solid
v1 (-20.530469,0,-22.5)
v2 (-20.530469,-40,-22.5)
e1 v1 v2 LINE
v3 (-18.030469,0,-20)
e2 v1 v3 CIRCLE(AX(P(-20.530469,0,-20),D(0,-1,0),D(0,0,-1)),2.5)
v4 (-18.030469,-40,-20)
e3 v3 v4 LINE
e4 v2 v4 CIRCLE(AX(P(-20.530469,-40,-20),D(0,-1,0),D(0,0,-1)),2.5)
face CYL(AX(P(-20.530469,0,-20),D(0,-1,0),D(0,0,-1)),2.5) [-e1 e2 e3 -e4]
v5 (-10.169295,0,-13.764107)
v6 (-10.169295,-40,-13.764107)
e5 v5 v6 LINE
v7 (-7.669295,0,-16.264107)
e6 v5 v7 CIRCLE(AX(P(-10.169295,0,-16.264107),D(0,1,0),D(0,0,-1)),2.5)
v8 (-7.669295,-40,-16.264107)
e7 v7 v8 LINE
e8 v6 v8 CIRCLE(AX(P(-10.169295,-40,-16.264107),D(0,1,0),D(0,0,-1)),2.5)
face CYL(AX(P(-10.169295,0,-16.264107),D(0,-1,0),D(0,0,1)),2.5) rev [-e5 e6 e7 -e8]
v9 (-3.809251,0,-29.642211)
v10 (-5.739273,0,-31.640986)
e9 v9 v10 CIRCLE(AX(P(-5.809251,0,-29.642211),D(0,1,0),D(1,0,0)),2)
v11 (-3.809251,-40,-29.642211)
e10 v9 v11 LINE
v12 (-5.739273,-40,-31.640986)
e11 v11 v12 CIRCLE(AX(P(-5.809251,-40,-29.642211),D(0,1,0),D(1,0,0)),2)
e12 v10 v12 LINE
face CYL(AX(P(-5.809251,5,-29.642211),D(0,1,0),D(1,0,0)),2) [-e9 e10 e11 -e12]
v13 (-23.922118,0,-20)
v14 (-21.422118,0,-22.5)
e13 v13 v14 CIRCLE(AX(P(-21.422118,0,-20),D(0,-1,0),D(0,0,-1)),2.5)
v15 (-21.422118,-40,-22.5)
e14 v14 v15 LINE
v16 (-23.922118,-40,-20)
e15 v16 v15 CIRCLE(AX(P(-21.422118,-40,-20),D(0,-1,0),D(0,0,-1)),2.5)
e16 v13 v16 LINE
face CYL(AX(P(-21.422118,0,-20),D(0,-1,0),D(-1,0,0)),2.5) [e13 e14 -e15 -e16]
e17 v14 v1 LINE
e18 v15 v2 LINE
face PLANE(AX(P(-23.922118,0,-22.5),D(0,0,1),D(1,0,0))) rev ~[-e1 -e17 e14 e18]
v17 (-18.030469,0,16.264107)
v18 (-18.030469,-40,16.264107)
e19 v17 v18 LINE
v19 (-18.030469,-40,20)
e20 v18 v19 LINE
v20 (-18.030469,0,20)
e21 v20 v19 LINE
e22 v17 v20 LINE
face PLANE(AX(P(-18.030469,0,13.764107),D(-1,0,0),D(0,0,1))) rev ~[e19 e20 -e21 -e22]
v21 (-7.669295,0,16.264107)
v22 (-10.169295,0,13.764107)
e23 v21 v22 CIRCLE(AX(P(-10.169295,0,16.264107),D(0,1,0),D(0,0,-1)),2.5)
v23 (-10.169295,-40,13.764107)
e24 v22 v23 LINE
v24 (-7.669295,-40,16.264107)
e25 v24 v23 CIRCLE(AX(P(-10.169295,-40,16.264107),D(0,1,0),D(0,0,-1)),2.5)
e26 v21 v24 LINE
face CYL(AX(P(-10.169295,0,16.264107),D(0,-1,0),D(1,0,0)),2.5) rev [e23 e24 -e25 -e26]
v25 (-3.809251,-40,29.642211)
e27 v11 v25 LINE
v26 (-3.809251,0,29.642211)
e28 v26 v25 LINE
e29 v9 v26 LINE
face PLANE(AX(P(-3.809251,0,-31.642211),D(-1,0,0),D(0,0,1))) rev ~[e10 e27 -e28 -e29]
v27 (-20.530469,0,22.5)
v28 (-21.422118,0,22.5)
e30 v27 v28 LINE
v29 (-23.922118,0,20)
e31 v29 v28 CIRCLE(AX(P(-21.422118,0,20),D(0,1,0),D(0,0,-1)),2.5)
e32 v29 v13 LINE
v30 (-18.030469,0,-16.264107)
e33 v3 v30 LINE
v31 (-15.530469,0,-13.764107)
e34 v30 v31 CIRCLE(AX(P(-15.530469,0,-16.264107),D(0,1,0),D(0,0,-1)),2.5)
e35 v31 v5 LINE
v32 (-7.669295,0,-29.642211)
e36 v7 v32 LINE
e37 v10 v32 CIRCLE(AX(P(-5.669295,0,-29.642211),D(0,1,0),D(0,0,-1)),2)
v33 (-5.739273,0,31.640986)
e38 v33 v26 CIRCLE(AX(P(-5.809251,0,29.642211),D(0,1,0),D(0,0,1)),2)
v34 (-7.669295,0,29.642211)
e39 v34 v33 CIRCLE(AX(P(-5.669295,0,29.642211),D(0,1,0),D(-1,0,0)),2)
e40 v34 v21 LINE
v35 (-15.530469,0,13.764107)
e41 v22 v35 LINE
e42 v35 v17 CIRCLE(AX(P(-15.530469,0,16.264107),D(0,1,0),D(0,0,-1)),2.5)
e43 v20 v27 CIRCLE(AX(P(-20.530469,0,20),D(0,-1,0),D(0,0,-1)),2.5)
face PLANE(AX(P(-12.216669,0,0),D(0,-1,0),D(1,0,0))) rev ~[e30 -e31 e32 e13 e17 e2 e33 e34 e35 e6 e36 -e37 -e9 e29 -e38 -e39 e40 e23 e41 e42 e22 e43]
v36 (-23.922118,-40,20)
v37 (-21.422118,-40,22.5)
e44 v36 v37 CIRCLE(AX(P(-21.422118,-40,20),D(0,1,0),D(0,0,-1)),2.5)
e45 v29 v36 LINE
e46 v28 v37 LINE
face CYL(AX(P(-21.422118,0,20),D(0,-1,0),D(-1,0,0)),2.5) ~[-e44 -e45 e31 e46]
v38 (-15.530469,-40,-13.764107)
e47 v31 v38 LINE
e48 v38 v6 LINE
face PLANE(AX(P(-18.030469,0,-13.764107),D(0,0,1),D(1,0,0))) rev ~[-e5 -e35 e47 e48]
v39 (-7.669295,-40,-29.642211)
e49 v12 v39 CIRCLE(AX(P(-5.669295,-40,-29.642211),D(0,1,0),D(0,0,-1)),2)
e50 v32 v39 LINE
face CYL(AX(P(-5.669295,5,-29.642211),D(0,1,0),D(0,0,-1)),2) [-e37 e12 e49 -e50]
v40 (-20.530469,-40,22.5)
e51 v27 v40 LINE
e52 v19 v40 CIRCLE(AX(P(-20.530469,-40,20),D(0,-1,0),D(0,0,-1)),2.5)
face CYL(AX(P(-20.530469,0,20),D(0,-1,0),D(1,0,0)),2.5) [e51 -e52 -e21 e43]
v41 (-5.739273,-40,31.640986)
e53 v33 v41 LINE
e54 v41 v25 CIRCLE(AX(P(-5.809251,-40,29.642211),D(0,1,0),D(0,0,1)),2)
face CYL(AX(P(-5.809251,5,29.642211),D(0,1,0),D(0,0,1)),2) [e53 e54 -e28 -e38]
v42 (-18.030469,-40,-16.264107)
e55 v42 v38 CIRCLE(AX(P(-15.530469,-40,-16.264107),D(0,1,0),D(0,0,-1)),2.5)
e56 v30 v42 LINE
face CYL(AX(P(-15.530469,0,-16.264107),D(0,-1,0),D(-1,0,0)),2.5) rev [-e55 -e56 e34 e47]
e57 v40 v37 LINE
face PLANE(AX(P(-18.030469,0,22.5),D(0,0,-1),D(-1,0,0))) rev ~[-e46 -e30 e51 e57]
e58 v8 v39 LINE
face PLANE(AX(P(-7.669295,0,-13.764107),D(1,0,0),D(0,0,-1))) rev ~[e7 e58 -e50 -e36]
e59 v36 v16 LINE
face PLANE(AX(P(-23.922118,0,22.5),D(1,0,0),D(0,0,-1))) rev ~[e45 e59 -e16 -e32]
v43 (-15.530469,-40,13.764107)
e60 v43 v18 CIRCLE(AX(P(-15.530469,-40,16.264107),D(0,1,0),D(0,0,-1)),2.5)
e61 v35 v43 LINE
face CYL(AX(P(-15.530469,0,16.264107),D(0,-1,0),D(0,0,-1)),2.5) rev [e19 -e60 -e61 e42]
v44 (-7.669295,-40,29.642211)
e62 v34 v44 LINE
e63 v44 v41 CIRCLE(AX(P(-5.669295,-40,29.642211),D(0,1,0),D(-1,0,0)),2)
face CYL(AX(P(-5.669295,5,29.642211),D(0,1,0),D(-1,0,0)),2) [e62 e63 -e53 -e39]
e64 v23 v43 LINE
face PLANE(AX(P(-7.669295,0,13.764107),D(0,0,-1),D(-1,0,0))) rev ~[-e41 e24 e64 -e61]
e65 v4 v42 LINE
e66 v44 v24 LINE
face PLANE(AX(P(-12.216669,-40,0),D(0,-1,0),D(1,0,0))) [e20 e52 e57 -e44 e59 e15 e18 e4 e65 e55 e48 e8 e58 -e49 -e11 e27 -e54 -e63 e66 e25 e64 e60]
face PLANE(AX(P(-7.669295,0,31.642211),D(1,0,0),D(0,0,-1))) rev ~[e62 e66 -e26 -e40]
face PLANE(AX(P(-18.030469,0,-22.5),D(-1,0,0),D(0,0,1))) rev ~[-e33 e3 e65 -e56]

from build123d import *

# Parameters (mm, degrees)
F1_DEPTH    = 40
F2_R        = 2.5
F3_T1_DEPTH = 50


# Not quite as in the source:
# - a fillet or chamfer that OpenCascade refuses, or shapes differently, is made with other operations: its cross-section is extruded or revolved along the edge and cut away or added


with BuildPart() as f1:
    # F0 (on Front) → F1 (new body)
    with BuildSketch(Plane.XZ):
        Polygon((-23.9221176861, 22.5), (-23.9221176861, 0), (-23.9221176861, -22.5), (-18.0304694658, -22.5), (-18.0304694658, -13.7641071746), (-7.6692953279, -13.7641071746), (-7.6692953279, -31.6422108453), (-3.809250768, -31.6422108453), (-3.809250768, 0), (-3.809250768, 31.6422108453), (-7.6692953279, 31.6422108453), (-7.6692953279, 13.7641071746), (-18.0304694658, 13.7641071746), (-18.0304694658, 22.5), align=None)
    extrude(amount=F1_DEPTH)

    # F2
    f2_edges = [f1.edges().sort_by_distance(p)[0] for p in [
        (-23.922118, -20, 22.5),
        (-18.030469, -20, 22.5),
        (-23.922118, -20, -22.5),
        (-18.030469, -20, -22.5),
        (-18.030469, -20, 13.764107),
        (-18.030469, -20, -13.764107),
        (-7.669295, -20, 13.764107),
        (-7.669295, -20, -13.764107),
    ]]
    fillet(f2_edges, radius=F2_R)

    # F3: fillet of radius 2 on 4 edges, made by hand

    # F3_s2 → F3_t1 (cut)
    with BuildSketch(Plane.XZ.offset(-5)):
        with BuildLine():
            ThreePointArc((-7.6692953279, 29.6422108453), (-7.0835088902, 31.0564244077), (-5.6692953279, 31.6422108453))
            Line((-5.6692953279, 31.6422108453), (-7.6692953279, 31.6422108453))
            Line((-7.6692953279, 31.6422108453), (-7.6692953279, 29.6422108453))
        make_face()
        with BuildLine():
            ThreePointArc((-5.809250768, 31.6422108453), (-4.3950372056, 31.0564244077), (-3.809250768, 29.6422108453))
            Line((-3.809250768, 29.6422108453), (-3.809250768, 31.6422108453))
            Line((-3.809250768, 31.6422108453), (-5.809250768, 31.6422108453))
        make_face()
        with BuildLine():
            ThreePointArc((-5.6692953279, -31.6422108453), (-7.0835088902, -31.0564244077), (-7.6692953279, -29.6422108453))
            Line((-7.6692953279, -29.6422108453), (-7.6692953279, -31.6422108453))
            Line((-7.6692953279, -31.6422108453), (-5.6692953279, -31.6422108453))
        make_face()
        with BuildLine():
            ThreePointArc((-3.809250768, -29.6422108453), (-4.3950372056, -31.0564244077), (-5.809250768, -31.6422108453))
            Line((-5.809250768, -31.6422108453), (-3.809250768, -31.6422108453))
            Line((-3.809250768, -31.6422108453), (-3.809250768, -29.6422108453))
        make_face()
    extrude(amount=F3_T1_DEPTH, mode=Mode.SUBTRACT)


solid = f1.part
